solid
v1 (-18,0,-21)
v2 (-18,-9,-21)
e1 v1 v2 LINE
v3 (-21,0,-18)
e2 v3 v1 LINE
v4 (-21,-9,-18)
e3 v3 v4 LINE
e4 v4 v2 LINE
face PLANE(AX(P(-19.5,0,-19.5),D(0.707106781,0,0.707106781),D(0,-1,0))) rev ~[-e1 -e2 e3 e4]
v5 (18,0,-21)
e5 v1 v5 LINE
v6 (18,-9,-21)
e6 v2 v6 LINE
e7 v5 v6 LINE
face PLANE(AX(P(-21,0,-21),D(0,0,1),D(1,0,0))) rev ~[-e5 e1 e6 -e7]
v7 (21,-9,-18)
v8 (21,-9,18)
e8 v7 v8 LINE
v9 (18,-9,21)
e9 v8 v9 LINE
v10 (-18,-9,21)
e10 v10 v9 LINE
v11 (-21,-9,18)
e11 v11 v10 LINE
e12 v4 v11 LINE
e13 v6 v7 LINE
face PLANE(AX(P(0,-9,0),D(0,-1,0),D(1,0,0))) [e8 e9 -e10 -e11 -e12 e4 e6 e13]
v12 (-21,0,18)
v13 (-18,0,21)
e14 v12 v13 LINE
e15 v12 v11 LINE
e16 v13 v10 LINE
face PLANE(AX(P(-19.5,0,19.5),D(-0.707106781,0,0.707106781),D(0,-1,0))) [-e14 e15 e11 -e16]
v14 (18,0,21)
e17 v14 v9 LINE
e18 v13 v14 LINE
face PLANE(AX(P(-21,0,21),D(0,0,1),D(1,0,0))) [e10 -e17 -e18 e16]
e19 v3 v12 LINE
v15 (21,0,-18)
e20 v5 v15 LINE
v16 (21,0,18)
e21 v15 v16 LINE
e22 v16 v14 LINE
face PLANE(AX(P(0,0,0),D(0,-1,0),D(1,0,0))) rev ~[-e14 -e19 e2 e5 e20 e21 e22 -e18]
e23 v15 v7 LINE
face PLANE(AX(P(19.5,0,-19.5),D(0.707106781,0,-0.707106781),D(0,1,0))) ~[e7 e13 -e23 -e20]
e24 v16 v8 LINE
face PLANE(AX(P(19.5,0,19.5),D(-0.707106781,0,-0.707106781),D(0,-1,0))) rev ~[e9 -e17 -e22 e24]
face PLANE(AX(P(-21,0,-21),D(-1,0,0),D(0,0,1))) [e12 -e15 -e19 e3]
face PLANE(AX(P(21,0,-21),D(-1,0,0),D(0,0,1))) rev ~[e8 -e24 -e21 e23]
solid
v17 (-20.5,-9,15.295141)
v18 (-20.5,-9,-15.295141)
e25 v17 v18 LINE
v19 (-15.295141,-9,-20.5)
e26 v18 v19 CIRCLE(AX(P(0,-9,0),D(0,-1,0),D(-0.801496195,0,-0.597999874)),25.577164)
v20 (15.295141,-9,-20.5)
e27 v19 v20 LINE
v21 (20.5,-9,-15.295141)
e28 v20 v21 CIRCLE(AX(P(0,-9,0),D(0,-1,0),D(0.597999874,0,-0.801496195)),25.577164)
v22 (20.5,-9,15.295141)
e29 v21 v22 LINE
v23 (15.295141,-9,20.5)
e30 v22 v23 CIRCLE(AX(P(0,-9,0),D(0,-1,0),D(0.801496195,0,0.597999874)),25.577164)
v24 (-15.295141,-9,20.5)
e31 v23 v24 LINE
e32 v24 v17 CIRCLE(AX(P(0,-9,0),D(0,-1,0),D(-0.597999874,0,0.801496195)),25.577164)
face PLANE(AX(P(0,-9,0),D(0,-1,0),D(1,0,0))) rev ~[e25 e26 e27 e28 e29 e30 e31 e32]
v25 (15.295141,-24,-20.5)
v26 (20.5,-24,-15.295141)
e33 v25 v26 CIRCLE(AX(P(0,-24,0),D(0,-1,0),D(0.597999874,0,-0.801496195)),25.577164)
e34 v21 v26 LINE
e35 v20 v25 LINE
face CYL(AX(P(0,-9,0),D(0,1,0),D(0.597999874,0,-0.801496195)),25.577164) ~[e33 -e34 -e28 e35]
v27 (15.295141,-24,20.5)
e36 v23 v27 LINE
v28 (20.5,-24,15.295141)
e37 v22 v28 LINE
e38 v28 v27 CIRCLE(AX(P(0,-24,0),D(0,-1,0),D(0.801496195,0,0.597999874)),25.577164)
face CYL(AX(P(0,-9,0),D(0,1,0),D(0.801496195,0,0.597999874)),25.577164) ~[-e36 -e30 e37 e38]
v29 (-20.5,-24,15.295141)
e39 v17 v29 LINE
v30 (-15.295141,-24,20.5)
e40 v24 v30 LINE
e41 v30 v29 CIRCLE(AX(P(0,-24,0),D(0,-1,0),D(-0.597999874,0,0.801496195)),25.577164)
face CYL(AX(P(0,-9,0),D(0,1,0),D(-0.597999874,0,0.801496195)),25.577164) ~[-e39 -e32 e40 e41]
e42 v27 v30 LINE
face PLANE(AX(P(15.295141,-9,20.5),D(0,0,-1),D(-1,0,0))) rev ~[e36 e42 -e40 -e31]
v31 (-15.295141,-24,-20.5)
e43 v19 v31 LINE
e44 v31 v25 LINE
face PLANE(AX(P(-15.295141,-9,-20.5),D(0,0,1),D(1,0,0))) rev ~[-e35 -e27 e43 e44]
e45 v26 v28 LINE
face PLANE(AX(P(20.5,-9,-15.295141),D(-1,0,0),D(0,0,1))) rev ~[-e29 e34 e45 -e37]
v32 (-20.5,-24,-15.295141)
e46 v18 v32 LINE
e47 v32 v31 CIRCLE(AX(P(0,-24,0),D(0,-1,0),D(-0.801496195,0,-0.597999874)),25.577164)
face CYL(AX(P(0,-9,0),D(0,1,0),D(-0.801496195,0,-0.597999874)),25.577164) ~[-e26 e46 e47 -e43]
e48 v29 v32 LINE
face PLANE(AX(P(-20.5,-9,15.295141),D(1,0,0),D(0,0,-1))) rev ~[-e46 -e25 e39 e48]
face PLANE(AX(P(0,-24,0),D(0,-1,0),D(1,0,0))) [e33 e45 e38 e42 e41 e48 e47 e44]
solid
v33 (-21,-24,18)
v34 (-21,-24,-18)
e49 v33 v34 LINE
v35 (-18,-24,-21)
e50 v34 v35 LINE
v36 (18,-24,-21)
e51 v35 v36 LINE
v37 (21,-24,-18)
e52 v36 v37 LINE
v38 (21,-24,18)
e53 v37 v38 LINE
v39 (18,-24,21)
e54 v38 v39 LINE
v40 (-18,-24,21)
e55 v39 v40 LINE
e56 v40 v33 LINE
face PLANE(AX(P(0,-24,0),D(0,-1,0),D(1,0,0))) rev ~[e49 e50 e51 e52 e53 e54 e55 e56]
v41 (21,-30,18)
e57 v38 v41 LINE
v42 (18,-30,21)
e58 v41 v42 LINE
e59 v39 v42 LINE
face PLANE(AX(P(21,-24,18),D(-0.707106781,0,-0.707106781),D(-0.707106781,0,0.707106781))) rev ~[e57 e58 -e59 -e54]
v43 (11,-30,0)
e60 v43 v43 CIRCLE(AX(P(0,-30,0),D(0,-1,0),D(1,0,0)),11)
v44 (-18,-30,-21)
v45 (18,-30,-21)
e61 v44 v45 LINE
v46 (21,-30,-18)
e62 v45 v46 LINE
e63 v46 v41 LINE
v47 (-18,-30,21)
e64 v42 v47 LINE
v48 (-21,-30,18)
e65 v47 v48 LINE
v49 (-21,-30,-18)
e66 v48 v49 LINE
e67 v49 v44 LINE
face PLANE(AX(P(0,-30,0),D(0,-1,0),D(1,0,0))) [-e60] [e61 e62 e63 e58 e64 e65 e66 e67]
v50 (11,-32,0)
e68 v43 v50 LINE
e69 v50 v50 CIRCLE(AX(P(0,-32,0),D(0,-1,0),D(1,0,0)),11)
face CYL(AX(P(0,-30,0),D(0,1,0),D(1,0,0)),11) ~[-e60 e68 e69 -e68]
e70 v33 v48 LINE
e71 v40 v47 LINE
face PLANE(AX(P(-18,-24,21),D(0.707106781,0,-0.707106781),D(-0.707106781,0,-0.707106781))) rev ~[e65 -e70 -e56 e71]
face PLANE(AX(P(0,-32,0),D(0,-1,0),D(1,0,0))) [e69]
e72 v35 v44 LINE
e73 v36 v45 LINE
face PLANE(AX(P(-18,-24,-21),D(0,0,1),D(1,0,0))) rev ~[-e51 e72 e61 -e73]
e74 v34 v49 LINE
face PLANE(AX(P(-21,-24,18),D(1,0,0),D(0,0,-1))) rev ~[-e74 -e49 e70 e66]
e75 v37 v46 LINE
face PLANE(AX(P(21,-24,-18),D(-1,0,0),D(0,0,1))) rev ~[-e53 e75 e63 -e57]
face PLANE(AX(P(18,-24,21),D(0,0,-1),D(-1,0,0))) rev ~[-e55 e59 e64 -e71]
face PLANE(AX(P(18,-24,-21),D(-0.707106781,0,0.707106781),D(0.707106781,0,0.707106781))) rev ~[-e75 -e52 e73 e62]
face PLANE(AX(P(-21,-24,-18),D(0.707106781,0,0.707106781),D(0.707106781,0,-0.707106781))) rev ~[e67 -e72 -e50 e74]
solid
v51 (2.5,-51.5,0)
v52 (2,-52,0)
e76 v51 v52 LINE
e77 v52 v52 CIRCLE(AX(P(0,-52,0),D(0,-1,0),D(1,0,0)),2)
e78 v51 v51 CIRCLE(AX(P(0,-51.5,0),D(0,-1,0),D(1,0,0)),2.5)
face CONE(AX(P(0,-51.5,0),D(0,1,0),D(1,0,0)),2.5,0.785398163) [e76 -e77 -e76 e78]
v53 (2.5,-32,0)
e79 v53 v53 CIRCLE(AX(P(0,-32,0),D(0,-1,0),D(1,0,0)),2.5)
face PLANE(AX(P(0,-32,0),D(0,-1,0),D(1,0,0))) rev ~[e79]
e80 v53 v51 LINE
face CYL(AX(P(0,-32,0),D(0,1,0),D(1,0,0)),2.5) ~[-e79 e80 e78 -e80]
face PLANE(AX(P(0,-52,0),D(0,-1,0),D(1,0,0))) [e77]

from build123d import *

# Parameters (mm, degrees)
F0_W      = 42
F0_H      = 42
F1_DEPTH  = 9
F2_SIZE   = 3
F3_R      = 15
F4_DEPTH  = 15
F6_DEPTH  = 6
F7_R      = 11
F8_DEPTH  = 2
F9_R      = 2.5
F10_DEPTH = 20
F11_SIZE  = 0.5


with BuildPart() as f1:
    # F0 (on Front) → F1 (new body)
    with BuildSketch(Plane.XZ):
        Rectangle(F0_W, F0_H)
    extrude(amount=F1_DEPTH)

    # F2
    f2_edges = [f1.edges().sort_by_distance(p)[0] for p in [
        (-21, -4.5, 21),
        (21, -4.5, 21),
        (21, -4.5, -21),
        (-21, -4.5, -21),
    ]]
    chamfer(f2_edges, length=F2_SIZE)


with BuildPart() as f4:
    # F3 (on face) → F4 (new body)
    with BuildSketch(Plane.XZ.offset(9)):
        with BuildLine():
            Line((15.2951411283, 20.5), (-15.2951411283, 20.5))
            ThreePointArc((-15.2951411283, 20.5), (-18.0857864376, 18.0857864376), (-20.5, 15.2951411283))
            Line((-20.5, 15.2951411283), (-20.5, -15.2951411283))
            ThreePointArc((-20.5, -15.2951411283), (-18.0857864376, -18.0857864376), (-15.2951411283, -20.5))
            Line((-15.2951411283, -20.5), (15.2951411283, -20.5))
            ThreePointArc((15.2951411283, -20.5), (18.0857864376, -18.0857864376), (20.5, -15.2951411283))
            Line((20.5, -15.2951411283), (20.5, 15.2951411283))
            ThreePointArc((20.5, 15.2951411283), (18.0857864376, 18.0857864376), (15.2951411283, 20.5))
        make_face()
        Circle(F3_R, mode=Mode.SUBTRACT)
        Circle(F3_R)
    extrude(amount=F4_DEPTH)


with BuildPart() as f6:
    # F5 (on face) → F6 (new body)
    with BuildSketch(Plane.XZ.offset(24)):
        Polygon((-18, 21), (-21, 18), (-21, -18), (-18, -21), (18, -21), (21, -18), (21, 18), (18, 21), align=None)
    extrude(amount=F6_DEPTH)

    # F7 (on face) → F8 (join)
    with BuildSketch(Plane.XZ.offset(30)):
        Circle(F7_R)
    extrude(amount=F8_DEPTH)


with BuildPart() as f10:
    # F9 (on face) → F10 (new body)
    with BuildSketch(Plane.XZ.offset(32)):
        Circle(F9_R)
    extrude(amount=F10_DEPTH)

    # F11
    f11_edges = [f10.edges().sort_by_distance(p)[0] for p in [
        (-2.5, -52, 0),
    ]]
    chamfer(f11_edges, length=F11_SIZE)


solid = Compound([f1.part, f4.part, f6.part, f10.part])
